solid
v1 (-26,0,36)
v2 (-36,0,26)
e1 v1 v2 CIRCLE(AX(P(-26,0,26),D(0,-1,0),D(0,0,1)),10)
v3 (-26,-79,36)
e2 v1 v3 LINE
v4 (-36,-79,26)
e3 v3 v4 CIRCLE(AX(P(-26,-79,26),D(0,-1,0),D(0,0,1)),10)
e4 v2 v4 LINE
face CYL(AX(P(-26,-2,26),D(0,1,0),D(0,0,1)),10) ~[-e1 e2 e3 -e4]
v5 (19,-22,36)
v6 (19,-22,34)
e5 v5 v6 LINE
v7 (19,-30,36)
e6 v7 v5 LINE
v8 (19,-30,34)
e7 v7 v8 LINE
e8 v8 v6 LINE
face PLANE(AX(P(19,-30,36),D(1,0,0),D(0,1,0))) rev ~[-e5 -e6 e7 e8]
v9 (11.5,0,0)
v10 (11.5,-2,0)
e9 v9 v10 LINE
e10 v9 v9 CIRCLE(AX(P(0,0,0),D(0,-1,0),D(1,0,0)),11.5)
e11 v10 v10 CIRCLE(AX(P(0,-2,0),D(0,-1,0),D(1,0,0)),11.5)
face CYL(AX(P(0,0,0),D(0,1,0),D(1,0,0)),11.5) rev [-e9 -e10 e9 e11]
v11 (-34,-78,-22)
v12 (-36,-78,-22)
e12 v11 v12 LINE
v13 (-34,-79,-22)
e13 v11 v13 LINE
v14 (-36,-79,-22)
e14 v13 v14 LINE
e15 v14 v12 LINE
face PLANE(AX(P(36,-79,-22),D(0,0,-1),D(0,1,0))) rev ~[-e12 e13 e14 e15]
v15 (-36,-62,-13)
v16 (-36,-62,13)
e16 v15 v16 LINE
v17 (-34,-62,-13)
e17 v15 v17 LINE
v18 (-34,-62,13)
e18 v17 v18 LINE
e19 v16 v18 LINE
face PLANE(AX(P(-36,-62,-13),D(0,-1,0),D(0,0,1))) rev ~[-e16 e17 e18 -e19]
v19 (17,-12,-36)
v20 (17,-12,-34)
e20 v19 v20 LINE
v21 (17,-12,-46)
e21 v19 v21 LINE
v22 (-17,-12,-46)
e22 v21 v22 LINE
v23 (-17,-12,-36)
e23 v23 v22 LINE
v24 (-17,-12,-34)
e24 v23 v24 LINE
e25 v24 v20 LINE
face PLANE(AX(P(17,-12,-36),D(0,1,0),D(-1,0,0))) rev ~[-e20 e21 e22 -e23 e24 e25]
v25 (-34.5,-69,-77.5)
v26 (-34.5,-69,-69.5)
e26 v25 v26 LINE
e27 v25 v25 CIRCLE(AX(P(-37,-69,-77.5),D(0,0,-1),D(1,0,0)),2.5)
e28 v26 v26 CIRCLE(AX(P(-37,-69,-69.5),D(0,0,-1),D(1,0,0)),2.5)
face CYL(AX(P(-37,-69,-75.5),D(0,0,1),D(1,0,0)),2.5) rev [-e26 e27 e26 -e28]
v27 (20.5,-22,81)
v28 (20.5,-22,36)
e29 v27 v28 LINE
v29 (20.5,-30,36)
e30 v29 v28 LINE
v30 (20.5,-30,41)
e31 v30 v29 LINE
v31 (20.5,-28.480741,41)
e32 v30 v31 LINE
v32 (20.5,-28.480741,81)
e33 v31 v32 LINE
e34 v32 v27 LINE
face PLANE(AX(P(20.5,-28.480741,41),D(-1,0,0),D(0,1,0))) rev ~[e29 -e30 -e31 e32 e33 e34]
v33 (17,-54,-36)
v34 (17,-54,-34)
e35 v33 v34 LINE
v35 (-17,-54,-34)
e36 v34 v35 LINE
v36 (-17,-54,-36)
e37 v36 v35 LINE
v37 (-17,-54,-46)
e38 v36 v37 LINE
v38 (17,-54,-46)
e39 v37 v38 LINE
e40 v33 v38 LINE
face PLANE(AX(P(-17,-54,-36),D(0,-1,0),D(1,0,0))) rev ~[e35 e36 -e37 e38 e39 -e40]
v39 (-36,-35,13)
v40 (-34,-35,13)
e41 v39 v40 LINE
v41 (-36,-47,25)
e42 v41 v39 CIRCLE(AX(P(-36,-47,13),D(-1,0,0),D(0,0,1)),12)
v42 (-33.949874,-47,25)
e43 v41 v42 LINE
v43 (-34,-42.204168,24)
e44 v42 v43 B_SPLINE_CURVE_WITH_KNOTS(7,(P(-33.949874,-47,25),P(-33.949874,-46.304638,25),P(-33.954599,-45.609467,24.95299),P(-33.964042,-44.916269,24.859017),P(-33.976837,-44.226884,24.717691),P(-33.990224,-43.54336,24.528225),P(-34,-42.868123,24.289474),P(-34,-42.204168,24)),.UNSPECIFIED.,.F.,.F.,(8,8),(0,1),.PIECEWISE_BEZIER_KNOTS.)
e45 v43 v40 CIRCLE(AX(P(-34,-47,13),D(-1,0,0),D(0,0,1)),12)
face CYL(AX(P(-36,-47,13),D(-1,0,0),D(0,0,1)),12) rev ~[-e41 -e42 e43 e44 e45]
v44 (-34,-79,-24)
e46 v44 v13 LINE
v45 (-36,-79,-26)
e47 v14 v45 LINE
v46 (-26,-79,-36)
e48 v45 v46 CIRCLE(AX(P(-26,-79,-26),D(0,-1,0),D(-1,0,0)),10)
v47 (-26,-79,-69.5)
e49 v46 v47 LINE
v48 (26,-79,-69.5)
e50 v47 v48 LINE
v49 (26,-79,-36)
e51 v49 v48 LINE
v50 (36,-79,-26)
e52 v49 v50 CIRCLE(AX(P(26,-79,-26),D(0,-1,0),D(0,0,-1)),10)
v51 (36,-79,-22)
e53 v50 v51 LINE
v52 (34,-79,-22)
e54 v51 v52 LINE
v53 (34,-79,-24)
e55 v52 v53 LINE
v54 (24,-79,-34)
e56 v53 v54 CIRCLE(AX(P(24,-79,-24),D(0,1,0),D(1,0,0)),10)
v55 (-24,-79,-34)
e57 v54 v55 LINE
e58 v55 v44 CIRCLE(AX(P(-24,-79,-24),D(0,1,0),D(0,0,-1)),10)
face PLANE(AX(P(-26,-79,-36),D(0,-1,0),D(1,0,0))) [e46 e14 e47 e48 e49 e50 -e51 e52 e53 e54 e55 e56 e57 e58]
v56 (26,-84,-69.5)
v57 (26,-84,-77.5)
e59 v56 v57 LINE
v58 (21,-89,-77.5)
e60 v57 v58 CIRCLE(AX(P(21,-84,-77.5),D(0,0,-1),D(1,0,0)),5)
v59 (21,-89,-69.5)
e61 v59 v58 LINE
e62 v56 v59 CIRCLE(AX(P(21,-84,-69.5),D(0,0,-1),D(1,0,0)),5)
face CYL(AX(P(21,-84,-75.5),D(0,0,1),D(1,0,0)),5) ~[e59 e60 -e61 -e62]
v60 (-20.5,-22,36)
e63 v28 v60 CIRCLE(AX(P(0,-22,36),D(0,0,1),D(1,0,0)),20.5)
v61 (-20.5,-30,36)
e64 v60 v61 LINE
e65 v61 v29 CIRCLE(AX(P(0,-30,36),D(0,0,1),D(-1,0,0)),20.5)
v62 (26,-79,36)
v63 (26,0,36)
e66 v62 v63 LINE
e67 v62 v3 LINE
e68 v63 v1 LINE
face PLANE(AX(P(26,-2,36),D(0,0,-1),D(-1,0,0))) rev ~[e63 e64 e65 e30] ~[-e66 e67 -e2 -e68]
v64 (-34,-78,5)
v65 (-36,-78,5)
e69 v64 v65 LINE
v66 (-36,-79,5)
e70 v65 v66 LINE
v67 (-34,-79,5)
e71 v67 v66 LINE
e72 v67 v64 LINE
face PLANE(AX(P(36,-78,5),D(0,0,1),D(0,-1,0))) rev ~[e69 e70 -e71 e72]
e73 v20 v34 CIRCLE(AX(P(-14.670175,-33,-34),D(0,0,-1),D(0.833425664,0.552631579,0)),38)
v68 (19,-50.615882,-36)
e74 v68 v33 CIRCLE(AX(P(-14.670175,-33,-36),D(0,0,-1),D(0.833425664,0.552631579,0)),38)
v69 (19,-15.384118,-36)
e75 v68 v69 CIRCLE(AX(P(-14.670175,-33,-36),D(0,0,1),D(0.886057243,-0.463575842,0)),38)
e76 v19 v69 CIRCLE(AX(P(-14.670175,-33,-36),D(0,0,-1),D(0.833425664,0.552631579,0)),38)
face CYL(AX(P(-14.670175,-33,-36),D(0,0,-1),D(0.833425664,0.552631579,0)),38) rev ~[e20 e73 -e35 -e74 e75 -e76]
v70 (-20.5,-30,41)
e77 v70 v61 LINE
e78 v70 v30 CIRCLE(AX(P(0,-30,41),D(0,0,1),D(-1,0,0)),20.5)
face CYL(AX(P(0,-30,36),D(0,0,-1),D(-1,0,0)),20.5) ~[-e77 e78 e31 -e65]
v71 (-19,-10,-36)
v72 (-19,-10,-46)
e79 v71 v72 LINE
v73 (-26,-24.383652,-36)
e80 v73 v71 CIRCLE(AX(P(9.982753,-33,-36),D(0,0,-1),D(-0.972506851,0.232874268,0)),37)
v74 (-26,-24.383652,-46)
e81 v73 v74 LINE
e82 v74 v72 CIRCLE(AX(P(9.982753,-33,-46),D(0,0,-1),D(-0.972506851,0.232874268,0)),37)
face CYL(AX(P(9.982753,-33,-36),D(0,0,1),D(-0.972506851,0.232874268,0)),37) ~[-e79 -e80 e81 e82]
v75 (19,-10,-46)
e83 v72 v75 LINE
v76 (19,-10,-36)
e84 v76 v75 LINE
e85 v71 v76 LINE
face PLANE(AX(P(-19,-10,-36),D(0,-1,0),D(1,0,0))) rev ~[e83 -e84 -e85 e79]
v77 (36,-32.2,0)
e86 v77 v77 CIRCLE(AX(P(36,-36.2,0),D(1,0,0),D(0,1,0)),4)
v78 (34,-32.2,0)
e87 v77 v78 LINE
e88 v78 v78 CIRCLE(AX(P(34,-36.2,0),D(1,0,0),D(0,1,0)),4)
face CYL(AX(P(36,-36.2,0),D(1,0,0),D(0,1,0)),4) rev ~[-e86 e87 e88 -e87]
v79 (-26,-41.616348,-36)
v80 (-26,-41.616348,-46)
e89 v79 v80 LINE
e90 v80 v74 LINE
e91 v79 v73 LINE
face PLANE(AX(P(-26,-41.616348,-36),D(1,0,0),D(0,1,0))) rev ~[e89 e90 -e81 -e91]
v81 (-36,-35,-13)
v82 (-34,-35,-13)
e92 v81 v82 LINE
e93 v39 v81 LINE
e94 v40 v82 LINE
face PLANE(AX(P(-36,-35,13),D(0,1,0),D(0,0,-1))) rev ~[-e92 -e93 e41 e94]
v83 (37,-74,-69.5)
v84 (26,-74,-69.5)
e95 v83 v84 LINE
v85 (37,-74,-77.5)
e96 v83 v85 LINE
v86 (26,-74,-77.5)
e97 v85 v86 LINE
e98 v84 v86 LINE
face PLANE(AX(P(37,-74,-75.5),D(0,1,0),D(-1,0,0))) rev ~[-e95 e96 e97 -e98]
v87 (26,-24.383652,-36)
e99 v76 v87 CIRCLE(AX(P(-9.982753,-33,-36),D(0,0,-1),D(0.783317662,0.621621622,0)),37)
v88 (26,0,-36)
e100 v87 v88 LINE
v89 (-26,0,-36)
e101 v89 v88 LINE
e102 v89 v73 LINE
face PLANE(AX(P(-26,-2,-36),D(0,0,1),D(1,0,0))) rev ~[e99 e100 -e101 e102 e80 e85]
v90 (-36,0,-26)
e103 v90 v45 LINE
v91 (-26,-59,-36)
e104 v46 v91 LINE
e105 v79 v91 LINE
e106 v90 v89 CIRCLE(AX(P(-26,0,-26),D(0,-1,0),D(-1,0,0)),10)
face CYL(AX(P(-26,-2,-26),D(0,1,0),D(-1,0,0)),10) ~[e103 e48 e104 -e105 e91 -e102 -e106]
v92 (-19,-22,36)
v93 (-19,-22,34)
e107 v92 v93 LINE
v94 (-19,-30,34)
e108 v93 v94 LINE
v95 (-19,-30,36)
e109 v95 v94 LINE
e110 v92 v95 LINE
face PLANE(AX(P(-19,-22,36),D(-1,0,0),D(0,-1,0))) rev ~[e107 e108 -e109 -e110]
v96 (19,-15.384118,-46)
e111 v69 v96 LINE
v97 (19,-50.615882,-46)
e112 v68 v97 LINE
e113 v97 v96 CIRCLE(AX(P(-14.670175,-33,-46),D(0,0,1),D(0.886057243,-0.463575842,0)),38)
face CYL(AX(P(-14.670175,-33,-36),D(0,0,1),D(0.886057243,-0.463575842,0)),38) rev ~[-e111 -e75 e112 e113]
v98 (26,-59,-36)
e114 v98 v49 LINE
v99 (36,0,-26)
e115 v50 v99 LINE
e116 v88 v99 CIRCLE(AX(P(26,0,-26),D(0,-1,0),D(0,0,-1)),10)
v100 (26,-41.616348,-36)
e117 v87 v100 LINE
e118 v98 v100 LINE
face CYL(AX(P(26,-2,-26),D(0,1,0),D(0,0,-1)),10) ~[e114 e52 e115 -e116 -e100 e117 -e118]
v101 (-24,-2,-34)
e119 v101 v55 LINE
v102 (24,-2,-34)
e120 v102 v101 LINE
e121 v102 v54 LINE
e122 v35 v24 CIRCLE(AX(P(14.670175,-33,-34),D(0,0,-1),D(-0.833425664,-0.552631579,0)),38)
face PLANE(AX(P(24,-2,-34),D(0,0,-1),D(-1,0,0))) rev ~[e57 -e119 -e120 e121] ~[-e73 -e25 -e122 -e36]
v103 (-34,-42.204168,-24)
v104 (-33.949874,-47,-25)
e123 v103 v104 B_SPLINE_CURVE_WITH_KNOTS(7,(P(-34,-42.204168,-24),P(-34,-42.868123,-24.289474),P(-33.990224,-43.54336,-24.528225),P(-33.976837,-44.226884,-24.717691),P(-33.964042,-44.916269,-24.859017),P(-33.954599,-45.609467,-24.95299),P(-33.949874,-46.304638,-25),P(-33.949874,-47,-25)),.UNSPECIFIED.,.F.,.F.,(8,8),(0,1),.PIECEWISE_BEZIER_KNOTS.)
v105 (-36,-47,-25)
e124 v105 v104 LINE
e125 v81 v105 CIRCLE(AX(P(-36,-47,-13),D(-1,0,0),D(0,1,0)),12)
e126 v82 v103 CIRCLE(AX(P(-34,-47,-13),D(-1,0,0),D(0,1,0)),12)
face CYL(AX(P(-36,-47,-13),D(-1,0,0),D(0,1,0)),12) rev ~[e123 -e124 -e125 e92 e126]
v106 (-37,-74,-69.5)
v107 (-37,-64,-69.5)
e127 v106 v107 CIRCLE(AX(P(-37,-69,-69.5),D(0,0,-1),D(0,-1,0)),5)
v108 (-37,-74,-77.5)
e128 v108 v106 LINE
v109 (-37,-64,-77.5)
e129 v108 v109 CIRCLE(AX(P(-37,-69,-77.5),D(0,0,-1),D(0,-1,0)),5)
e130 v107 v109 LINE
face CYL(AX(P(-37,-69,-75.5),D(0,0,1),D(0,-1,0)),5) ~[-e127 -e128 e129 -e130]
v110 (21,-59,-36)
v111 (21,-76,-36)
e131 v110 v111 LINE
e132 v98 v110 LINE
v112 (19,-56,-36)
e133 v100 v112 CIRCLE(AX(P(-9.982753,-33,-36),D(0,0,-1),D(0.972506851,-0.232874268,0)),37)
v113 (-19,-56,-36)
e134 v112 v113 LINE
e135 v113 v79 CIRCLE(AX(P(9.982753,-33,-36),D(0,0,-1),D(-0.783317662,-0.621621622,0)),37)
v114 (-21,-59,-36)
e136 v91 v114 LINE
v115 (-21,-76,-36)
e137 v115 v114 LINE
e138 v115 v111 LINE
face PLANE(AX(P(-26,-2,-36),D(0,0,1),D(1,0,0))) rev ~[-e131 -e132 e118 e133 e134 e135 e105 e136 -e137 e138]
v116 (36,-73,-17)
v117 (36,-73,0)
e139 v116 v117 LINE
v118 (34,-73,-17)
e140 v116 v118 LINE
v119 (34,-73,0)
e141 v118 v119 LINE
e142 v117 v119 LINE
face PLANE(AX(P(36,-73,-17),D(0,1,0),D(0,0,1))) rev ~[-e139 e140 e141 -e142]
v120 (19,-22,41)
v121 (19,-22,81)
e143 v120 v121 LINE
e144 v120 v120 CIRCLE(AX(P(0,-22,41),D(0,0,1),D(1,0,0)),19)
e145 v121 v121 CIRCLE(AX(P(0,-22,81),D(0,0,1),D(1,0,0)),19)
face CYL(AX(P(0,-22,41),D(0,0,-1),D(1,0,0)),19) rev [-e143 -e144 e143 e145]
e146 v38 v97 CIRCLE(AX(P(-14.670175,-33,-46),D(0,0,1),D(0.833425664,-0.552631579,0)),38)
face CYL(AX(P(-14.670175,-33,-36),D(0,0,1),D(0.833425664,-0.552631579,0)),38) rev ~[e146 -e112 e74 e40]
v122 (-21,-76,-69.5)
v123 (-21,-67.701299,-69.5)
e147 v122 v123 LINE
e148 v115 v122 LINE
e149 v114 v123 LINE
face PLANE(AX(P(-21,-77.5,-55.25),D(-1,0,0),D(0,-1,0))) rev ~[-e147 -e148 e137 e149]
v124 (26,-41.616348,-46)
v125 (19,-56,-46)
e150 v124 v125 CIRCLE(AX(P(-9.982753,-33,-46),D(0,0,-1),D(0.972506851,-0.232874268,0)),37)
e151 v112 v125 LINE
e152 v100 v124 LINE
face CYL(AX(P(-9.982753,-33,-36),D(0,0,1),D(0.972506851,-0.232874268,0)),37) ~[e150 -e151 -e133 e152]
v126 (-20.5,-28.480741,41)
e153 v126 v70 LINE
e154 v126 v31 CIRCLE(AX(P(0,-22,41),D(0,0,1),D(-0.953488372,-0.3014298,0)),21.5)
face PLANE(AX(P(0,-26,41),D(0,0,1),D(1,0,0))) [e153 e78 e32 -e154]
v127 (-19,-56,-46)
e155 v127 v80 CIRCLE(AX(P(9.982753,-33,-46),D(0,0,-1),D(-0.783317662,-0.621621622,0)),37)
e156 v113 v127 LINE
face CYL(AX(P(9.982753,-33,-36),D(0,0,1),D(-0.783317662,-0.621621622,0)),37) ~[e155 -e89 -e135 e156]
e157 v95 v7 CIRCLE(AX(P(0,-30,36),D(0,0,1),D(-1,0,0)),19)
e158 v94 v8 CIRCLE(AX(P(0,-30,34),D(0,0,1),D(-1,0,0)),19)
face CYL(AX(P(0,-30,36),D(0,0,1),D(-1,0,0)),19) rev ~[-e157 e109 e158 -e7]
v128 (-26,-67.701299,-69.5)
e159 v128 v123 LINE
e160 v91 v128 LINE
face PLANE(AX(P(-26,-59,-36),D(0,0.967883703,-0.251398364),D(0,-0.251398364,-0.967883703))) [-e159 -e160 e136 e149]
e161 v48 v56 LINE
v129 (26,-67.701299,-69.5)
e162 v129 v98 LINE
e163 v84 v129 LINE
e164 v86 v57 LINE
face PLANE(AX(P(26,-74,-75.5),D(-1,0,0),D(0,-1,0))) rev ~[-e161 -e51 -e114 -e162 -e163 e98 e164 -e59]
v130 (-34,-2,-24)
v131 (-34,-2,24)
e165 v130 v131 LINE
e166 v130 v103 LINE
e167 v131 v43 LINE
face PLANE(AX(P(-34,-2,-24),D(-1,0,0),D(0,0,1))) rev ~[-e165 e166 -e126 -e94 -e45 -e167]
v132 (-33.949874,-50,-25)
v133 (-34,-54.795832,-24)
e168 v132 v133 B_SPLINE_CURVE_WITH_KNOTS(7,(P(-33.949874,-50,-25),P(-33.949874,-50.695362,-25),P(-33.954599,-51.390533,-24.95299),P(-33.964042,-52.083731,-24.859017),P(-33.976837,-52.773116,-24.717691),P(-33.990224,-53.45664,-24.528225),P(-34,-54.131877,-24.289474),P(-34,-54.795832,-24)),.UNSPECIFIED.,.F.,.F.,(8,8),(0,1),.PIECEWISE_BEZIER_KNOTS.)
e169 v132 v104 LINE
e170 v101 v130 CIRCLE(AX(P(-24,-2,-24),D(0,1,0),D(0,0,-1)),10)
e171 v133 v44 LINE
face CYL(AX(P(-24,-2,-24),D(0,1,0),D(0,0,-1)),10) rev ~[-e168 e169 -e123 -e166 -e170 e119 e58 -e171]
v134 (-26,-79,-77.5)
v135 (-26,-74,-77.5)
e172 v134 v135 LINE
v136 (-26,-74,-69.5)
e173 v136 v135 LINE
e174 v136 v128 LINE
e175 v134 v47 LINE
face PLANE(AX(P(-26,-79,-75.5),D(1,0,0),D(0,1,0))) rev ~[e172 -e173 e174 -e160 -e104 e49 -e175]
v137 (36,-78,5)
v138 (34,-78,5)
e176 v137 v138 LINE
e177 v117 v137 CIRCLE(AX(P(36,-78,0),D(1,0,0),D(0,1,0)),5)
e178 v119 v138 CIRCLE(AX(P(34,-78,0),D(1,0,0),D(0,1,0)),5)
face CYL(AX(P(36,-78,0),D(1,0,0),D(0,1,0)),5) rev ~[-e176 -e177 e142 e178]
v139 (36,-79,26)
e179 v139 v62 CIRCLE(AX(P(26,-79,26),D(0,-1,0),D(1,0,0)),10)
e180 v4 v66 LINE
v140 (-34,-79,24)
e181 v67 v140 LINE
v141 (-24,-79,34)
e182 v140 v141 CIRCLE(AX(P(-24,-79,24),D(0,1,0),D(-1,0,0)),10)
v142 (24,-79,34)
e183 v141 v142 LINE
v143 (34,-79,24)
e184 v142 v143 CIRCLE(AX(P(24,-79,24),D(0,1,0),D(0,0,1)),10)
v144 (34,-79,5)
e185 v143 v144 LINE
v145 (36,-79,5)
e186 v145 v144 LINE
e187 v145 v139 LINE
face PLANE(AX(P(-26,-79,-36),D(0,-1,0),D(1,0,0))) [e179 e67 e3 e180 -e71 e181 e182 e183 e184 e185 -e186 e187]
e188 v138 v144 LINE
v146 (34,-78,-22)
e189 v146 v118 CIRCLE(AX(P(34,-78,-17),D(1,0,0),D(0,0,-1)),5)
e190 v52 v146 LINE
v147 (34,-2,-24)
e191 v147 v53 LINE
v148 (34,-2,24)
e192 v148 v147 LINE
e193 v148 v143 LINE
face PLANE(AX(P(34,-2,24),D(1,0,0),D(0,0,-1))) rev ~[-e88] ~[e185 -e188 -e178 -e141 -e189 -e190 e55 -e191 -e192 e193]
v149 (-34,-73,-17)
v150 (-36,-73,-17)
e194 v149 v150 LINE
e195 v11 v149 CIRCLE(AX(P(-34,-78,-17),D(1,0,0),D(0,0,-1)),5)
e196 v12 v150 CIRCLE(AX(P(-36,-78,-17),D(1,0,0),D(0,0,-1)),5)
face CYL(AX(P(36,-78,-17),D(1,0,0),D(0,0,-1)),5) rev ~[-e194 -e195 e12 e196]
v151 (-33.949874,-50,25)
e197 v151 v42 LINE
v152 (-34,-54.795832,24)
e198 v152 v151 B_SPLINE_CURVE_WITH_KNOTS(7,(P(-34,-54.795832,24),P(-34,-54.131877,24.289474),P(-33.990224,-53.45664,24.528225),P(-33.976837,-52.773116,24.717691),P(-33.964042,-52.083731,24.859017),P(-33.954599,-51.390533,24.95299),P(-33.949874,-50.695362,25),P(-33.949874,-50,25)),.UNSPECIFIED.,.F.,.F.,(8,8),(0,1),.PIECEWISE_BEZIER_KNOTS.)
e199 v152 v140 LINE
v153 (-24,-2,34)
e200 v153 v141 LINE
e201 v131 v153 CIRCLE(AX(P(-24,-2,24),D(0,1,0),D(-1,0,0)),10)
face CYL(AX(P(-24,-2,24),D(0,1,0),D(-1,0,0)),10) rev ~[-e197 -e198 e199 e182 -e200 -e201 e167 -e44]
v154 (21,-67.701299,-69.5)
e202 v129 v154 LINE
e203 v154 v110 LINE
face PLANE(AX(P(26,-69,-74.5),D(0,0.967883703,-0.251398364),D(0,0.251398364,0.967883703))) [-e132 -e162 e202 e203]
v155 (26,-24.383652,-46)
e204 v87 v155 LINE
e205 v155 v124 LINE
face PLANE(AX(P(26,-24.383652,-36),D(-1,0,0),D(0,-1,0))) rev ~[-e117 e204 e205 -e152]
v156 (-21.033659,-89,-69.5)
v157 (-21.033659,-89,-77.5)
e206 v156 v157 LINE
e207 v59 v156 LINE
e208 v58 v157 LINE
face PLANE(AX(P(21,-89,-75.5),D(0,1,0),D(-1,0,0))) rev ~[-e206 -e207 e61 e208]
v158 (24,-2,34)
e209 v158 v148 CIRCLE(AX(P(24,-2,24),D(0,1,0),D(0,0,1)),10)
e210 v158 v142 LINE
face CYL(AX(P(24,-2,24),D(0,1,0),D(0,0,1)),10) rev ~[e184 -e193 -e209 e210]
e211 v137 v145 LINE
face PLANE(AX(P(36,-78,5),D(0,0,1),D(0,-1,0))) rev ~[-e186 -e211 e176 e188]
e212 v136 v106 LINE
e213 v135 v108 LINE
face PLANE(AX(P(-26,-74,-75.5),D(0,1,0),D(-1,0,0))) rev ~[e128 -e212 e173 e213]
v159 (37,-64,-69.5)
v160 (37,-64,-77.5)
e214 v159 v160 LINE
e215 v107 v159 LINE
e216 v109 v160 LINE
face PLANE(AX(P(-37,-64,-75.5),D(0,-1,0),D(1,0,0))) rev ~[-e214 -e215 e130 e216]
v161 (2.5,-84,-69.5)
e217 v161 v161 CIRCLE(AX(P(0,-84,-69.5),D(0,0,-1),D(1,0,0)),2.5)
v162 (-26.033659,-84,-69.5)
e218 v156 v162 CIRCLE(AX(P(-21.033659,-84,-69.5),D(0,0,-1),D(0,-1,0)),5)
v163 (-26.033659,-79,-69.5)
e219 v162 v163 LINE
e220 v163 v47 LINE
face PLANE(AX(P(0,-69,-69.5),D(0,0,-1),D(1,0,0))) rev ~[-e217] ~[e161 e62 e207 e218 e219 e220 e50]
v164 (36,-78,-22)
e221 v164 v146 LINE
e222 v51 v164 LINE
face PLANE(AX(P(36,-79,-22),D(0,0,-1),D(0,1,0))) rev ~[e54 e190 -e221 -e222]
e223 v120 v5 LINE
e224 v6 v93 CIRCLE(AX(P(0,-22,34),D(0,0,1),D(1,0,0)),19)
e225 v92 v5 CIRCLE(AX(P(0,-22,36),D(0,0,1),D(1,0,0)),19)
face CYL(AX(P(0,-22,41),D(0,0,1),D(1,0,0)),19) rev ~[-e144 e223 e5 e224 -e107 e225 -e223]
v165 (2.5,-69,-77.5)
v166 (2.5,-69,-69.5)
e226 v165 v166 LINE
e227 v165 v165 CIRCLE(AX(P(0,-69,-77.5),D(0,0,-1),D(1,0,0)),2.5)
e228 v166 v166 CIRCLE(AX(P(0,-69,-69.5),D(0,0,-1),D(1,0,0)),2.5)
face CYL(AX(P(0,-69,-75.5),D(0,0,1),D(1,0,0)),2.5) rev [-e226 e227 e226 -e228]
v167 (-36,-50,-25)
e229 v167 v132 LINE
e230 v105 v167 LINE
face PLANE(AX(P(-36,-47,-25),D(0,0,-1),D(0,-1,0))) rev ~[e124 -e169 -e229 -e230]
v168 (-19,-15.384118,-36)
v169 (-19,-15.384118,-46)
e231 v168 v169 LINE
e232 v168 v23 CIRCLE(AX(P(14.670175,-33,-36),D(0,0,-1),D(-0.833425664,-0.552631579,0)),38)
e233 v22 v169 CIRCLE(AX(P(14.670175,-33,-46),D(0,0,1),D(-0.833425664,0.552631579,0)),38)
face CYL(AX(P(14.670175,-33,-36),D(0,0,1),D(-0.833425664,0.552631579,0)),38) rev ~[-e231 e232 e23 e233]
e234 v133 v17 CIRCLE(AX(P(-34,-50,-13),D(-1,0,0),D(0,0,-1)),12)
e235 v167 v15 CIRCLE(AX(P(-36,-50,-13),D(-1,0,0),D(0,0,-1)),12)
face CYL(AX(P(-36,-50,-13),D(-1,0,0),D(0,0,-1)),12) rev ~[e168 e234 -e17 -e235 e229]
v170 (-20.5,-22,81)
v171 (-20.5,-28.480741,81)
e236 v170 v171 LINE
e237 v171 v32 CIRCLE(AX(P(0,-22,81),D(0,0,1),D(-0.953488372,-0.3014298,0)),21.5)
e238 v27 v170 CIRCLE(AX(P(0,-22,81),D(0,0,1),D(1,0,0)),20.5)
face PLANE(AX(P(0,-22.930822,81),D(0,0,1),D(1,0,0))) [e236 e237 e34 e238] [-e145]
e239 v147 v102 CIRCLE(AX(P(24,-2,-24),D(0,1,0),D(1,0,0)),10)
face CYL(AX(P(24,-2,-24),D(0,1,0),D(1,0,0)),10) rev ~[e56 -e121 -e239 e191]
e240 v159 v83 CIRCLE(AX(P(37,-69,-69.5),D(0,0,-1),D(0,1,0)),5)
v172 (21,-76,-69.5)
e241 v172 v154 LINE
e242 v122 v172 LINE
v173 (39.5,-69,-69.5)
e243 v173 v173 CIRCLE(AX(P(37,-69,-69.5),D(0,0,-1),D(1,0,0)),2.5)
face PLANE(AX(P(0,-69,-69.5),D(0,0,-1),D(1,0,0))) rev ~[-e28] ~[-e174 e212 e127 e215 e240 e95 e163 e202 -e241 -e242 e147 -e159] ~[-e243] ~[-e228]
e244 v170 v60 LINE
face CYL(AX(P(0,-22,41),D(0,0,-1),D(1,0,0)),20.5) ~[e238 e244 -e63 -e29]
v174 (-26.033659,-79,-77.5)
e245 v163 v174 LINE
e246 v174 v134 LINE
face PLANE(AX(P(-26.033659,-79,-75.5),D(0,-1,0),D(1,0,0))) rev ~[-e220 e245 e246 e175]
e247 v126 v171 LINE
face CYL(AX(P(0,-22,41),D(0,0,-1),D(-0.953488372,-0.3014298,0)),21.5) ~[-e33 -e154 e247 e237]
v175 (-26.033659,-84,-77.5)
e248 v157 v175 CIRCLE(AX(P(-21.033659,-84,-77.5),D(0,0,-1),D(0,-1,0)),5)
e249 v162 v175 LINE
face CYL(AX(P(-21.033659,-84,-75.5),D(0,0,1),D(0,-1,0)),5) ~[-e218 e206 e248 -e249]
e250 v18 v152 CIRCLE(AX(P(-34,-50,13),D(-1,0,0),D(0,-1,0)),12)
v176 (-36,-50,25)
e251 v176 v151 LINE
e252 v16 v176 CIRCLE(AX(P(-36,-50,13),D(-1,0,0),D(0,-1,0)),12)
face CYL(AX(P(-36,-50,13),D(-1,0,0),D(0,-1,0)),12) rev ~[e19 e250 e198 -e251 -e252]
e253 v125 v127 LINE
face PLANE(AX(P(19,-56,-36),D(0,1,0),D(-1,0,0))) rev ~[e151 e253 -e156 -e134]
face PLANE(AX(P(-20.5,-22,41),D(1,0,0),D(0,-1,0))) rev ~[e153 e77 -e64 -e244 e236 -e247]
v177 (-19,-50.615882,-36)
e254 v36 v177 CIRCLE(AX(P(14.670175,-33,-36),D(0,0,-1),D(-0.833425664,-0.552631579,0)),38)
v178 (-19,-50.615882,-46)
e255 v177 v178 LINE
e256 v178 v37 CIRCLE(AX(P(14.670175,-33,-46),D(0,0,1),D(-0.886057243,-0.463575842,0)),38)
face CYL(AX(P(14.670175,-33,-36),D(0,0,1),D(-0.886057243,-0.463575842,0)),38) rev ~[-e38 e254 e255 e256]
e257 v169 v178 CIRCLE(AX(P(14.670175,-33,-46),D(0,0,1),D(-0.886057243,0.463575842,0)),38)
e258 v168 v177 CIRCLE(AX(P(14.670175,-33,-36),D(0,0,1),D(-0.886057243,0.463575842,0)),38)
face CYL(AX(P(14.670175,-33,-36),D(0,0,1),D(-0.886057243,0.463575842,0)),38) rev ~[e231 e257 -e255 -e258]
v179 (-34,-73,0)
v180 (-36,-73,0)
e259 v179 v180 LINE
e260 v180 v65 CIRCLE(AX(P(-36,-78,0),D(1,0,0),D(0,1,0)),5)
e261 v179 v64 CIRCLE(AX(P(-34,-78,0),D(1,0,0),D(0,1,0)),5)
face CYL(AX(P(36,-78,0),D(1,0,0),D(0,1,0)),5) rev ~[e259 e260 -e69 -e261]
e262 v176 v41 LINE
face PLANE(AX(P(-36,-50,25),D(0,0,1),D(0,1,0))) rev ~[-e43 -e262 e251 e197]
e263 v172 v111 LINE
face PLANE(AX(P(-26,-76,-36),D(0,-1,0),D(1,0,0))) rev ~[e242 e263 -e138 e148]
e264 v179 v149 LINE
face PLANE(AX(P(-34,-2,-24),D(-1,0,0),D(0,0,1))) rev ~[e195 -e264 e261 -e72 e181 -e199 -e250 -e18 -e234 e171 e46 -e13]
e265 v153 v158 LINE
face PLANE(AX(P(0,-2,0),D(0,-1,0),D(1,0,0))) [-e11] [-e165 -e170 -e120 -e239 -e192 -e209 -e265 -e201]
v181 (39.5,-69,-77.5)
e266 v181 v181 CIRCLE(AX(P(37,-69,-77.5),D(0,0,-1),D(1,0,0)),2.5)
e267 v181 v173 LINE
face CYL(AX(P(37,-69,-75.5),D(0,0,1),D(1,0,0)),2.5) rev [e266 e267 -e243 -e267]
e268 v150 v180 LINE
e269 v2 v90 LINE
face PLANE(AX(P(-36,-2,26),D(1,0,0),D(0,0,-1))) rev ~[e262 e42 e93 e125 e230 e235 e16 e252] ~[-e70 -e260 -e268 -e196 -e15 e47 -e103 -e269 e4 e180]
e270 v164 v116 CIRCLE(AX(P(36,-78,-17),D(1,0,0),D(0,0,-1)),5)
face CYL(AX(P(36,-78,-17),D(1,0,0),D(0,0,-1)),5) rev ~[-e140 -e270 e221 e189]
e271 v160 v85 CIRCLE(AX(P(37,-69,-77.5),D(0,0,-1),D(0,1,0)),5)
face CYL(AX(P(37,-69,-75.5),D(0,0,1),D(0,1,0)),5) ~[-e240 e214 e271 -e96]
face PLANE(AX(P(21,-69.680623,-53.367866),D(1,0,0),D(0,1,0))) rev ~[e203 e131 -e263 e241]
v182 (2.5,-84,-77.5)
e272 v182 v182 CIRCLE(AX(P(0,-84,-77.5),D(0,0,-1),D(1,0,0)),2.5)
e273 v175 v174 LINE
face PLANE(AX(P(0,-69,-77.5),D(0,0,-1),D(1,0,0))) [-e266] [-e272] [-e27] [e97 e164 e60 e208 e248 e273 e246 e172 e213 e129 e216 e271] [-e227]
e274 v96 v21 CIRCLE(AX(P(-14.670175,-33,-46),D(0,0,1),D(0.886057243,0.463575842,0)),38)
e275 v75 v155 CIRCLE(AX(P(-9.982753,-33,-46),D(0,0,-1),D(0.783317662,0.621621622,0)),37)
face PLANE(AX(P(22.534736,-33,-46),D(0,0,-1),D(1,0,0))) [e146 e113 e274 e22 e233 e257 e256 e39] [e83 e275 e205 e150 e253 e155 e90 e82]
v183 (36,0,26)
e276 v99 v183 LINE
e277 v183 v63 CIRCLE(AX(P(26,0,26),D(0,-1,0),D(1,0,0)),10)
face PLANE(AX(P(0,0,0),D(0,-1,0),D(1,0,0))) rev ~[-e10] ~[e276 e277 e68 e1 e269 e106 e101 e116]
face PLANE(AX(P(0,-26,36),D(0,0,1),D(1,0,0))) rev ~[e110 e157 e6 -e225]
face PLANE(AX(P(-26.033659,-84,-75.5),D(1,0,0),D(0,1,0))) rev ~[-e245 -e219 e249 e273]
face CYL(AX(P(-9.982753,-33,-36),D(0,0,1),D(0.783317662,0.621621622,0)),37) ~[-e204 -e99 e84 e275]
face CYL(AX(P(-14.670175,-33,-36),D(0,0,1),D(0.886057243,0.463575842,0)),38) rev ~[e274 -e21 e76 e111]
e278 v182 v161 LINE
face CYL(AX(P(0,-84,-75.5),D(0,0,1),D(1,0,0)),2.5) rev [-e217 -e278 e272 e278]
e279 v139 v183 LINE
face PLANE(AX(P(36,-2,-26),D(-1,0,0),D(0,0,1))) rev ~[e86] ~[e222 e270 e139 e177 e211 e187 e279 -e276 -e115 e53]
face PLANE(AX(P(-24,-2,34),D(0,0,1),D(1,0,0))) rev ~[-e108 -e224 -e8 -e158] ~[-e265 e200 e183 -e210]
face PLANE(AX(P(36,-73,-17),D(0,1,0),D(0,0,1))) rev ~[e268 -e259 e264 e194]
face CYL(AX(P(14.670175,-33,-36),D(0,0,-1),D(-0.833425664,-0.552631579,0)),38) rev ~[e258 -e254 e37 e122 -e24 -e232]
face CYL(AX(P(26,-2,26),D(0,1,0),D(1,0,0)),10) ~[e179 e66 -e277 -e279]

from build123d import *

# Parameters (mm, degrees)
F0_R      = 11.5
F1_DEPTH  = 2
F3_DEPTH  = 77
F5_DEPTH  = 3
F7_DEPTH  = 3
F9_DEPTH  = 5
F11_DEPTH = 3
F12_R     = 19
F13_DEPTH = 8
F14_R     = 19
F15_DEPTH = 40
F16_W     = 52
F16_H     = 3
F17_DEPTH = 38.5
F19_DEPTH = 3
F21_DEPTH = 10
F22_W     = 3
F22_H     = 38.5
F23_DEPTH = 5
F25_R     = 2.5
F25_W     = 47
F25_H     = 2
F26_DEPTH = 5
F27_DEPTH = 1
F29_DEPTH = 75
F30_DEPTH = 2
F24_W     = 3
F24_H     = 38.5
F31_DEPTH = 5
F32_R     = 4
F33_DEPTH = 3


with BuildPart() as f1:
    # F0 (on Front) → F1 (new body)
    with BuildSketch(Plane.XZ):
        with BuildLine():
            Line((26, 36), (-26, 36))
            ThreePointArc((-26, 36), (-33.0710678119, 33.0710678119), (-36, 26))
            Line((-36, 26), (-36, -26))
            ThreePointArc((-36, -26), (-33.0710678119, -33.0710678119), (-26, -36))
            Line((-26, -36), (26, -36))
            ThreePointArc((26, -36), (33.0710678119, -33.0710678119), (36, -26))
            Line((36, -26), (36, 26))
            ThreePointArc((36, 26), (33.0710678119, 33.0710678119), (26, 36))
        make_face()
        with BuildLine():
            Line((24, -34), (-24, -34))
            ThreePointArc((-24, -34), (-31.0710678119, -31.0710678119), (-34, -24))
            Line((-34, -24), (-34, 24))
            ThreePointArc((-34, 24), (-31.0710678119, 31.0710678119), (-24, 34))
            Line((-24, 34), (24, 34))
            ThreePointArc((24, 34), (31.0710678119, 31.0710678119), (34, 24))
            Line((34, 24), (34, -24))
            ThreePointArc((34, -24), (31.0710678119, -31.0710678119), (24, -34))
        make_face(mode=Mode.SUBTRACT)
        with BuildLine():
            ThreePointArc((-34, -24), (-31.0710678119, -31.0710678119), (-24, -34))
            Line((-24, -34), (24, -34))
            ThreePointArc((24, -34), (31.0710678119, -31.0710678119), (34, -24))
            Line((34, -24), (34, 24))
            ThreePointArc((34, 24), (31.0710678119, 31.0710678119), (24, 34))
            Line((24, 34), (-24, 34))
            ThreePointArc((-24, 34), (-31.0710678119, 31.0710678119), (-34, 24))
            Line((-34, 24), (-34, -24))
        make_face()
        Circle(F0_R, mode=Mode.SUBTRACT)
    extrude(amount=F1_DEPTH)

    # F2 (on face) → F3 (join)
    with BuildSketch(Plane.XZ.offset(2)):
        with BuildLine():
            Line((26, 36), (-26, 36))
            ThreePointArc((-26, 36), (-33.0710678119, 33.0710678119), (-36, 26))
            Line((-36, 26), (-36, -26))
            ThreePointArc((-36, -26), (-33.0710678119, -33.0710678119), (-26, -36))
            Line((-26, -36), (26, -36))
            ThreePointArc((26, -36), (33.0710678119, -33.0710678119), (36, -26))
            Line((36, -26), (36, 26))
            ThreePointArc((36, 26), (33.0710678119, 33.0710678119), (26, 36))
        make_face()
        with BuildLine():
            Line((24, -34), (-24, -34))
            ThreePointArc((-24, -34), (-31.0710678119, -31.0710678119), (-34, -24))
            Line((-34, -24), (-34, 24))
            ThreePointArc((-34, 24), (-31.0710678119, 31.0710678119), (-24, 34))
            Line((-24, 34), (24, 34))
            ThreePointArc((24, 34), (31.0710678119, 31.0710678119), (34, 24))
            Line((34, 24), (34, -24))
            ThreePointArc((34, -24), (31.0710678119, -31.0710678119), (24, -34))
        make_face(mode=Mode.SUBTRACT)
    extrude(amount=F3_DEPTH)

    # F4 (on face) → F5 (cut)
    with BuildSketch(Plane(origin=(-36, 0, 0), x_dir=(0, -1, 0), z_dir=(-1, 0, 0))):
        with BuildLine():
            ThreePointArc((62, 13), (58.4852813742, 21.4852813742), (50, 25))
            Line((50, 25), (47, 25))
            ThreePointArc((47, 25), (38.5147186258, 21.4852813742), (35, 13))
            Line((35, 13), (35, -13))
            ThreePointArc((35, -13), (38.5147186258, -21.4852813742), (47, -25))
            Line((47, -25), (50, -25))
            ThreePointArc((50, -25), (58.4852813742, -21.4852813742), (62, -13))
            Line((62, -13), (62, 13))
        make_face()
    extrude(amount=-F5_DEPTH, mode=Mode.SUBTRACT)

    # F6 (on face) → F7 (cut)
    with BuildSketch(Plane.XY.offset(36)):
        with BuildLine():
            Line((19, -30), (19, -22))
            ThreePointArc((19, -22), (0, -3), (-19, -22))
            Line((-19, -22), (-19, -30))
            ThreePointArc((-19, -30), (0, -49), (19, -30))
        make_face()
    extrude(amount=-F7_DEPTH, mode=Mode.SUBTRACT)

    # F8 (on face) → F9 (join)
    with BuildSketch(Plane.XY.offset(36)):
        with BuildLine():
            Line((-20.5, -22), (-20.5, -30))
            ThreePointArc((-20.5, -30), (0, -50.5), (20.5, -30))
            Line((20.5, -30), (20.5, -22))
            ThreePointArc((20.5, -22), (0, -1.5), (-20.5, -22))
        make_face()
        with BuildLine():
            ThreePointArc((-19, -22), (0, -3), (19, -22))
            Line((19, -22), (19, -22.3025978408))
            Line((19, -22.3025978408), (19, -29.6974021592))
            Line((19, -29.6974021592), (19, -30))
            ThreePointArc((19, -30), (0, -49), (-19, -30))
            Line((-19, -30), (-19, -22))
        make_face(mode=Mode.SUBTRACT)
        with BuildLine():
            Line((19, -22.3025978408), (19, -22))
            ThreePointArc((19, -22), (0, -3), (-19, -22))
            Line((-19, -22), (-19, -30))
            ThreePointArc((-19, -30), (0, -49), (19, -30))
            Line((19, -30), (19, -29.6974021592))
            Line((19, -29.6974021592), (19, -22.3025978408))
        make_face()
    extrude(amount=F9_DEPTH)

    # F10 (on face) → F11 (join)
    with BuildSketch(Plane.XY.offset(36)):
        with BuildLine():
            Line((20.5, -30), (20.5, -22))
            ThreePointArc((20.5, -22), (0, -1.5), (-20.5, -22))
            Line((-20.5, -22), (-20.5, -30))
            ThreePointArc((-20.5, -30), (0, -50.5), (20.5, -30))
        make_face()
    extrude(amount=F11_DEPTH)

    # F12 (on face) → F13 (cut)
    with BuildSketch(Plane.XY.offset(41)):
        with Locations((0, -22)):
            Circle(F12_R)
    extrude(amount=-F13_DEPTH, mode=Mode.SUBTRACT)

    # F14 (on face) → F15 (join)
    with BuildSketch(Plane.XY.offset(41)):
        with BuildLine():
            Line((-20.5, -22), (-20.5, -28.4807406984))
            ThreePointArc((-20.5, -28.4807406984), (0, -43.5), (20.5, -28.4807406984))
            Line((20.5, -28.4807406984), (20.5, -22))
            ThreePointArc((20.5, -22), (0, -1.5), (-20.5, -22))
        make_face()
        with Locations((0, -22)):
            Circle(F14_R, mode=Mode.SUBTRACT)
    extrude(amount=F15_DEPTH)

    # F16 (on face) → F17 (join)
    with BuildSketch(Plane(origin=(0, 0, -36), x_dir=(1, 0, 0), z_dir=(0, 0, -1))):
        with Locations((0, 77.5)):
            Rectangle(F16_W, F16_H)
    extrude(amount=F17_DEPTH)

    # F18 (on face) → F19 (cut)
    with BuildSketch(Plane(origin=(0, 0, -36), x_dir=(1, 0, 0), z_dir=(0, 0, -1))):
        with BuildLine():
            Line((-17, 12), (17, 12))
            ThreePointArc((17, 12), (23.3298247558, 33), (17, 54))
            Line((17, 54), (-17, 54))
            ThreePointArc((-17, 54), (-23.3298247558, 33), (-17, 12))
        make_face()
    extrude(amount=-F19_DEPTH, mode=Mode.SUBTRACT)

    # F20 (on face) → F21 (join)
    with BuildSketch(Plane(origin=(0, 0, -36), x_dir=(1, 0, 0), z_dir=(0, 0, -1))):
        with BuildLine():
            ThreePointArc((19, 50.6158820109), (23.3298247558, 33), (19, 15.3841179891))
            Line((19, 15.3841179891), (19, 10))
            ThreePointArc((19, 10), (23.2866263695, 16.8090036252), (26, 24.3836521016))
            Line((26, 24.3836521016), (26, 41.6163478984))
            ThreePointArc((26, 41.6163478984), (23.2866263695, 49.1909963748), (19, 56))
            Line((19, 56), (19, 50.6158820109))
        make_face()
        with BuildLine():
            Line((-19, 56), (-19, 50.6158820109))
            ThreePointArc((-19, 50.6158820109), (-18.0437883513, 52.3338197434), (-17, 54))
            Line((-17, 54), (17, 54))
            ThreePointArc((17, 54), (18.0437883513, 52.3338197434), (19, 50.6158820109))
            Line((19, 50.6158820109), (19, 56))
            Line((19, 56), (-19, 56))
        make_face()
        with BuildLine():
            Line((-19, 10), (-19, 15.3841179891))
            ThreePointArc((-19, 15.3841179891), (-23.3298247558, 33), (-19, 50.6158820109))
            Line((-19, 50.6158820109), (-19, 56))
            ThreePointArc((-19, 56), (-23.2866263695, 49.1909963748), (-26, 41.6163478984))
            Line((-26, 41.6163478984), (-26, 24.3836521016))
            ThreePointArc((-26, 24.3836521016), (-23.2866263695, 16.8090036252), (-19, 10))
        make_face()
        with BuildLine():
            Line((17, 12), (-17, 12))
            ThreePointArc((-17, 12), (-18.0437883513, 13.6661802566), (-19, 15.3841179891))
            Line((-19, 15.3841179891), (-19, 10))
            Line((-19, 10), (19, 10))
            Line((19, 10), (19, 15.3841179891))
            ThreePointArc((19, 15.3841179891), (18.0437883513, 13.6661802566), (17, 12))
        make_face()
    extrude(amount=F21_DEPTH)

    # F22 (on face) → F23 (join)
    with BuildSketch(Plane.YZ.offset(26)):
        Polygon((-76, -36), (-76, -74.5), (-69, -74.5), (-59, -36), align=None)
        with Locations((-77.5, -55.25)):
            Rectangle(F22_W, F22_H)
    extrude(amount=-F23_DEPTH)

    # F25 (on face) → F26 (join)
    with BuildSketch(Plane(origin=(0, 0, -74.5), x_dir=(1, 0, 0), z_dir=(0, 0, -1))):
        with BuildLine():
            Line((37, 74), (26, 74))
            Line((26, 74), (21, 74))
            Line((21, 74), (-26, 74))
            Line((-26, 74), (-37, 74))
            ThreePointArc((-37, 74), (-42, 69), (-37, 64))
            Line((-37, 64), (37, 64))
            ThreePointArc((37, 64), (42, 69), (37, 74))
        make_face()
        with Locations((-37, 69)):
            Circle(F25_R, mode=Mode.SUBTRACT)
        with Locations((0, 69)):
            Circle(F25_R, mode=Mode.SUBTRACT)
        with Locations((37, 69)):
            Circle(F25_R, mode=Mode.SUBTRACT)
        Polygon((26, 79), (-26, 79), (-26, 76), (21, 76), (21, 74), (26, 74), align=None)
        with Locations((-2.5, 75)):
            Rectangle(F25_W, F25_H)
        with BuildLine():
            Line((-26.0336585343, 79), (-26, 79))
            Line((-26, 79), (26, 79))
            Line((26, 79), (26, 84))
            ThreePointArc((26, 84), (24.5355339059, 87.5355339059), (21, 89))
            Line((21, 89), (-21.0336585343, 89))
            ThreePointArc((-21.0336585343, 89), (-24.5691924402, 87.5355339059), (-26.0336585343, 84))
            Line((-26.0336585343, 84), (-26.0336585343, 79))
        make_face()
        with Locations((0, 84)):
            Circle(F25_R, mode=Mode.SUBTRACT)
    extrude(amount=-F26_DEPTH)

    # F27 (add): faces of the model
    f27_faces = [f1.faces().sort_by_distance(p)[0] for p in [
        (23.5, -77.5, -74.5),
        (-2.5, -77.5, -74.5),
        (23.5, -72.5, -74.5),
        (-26.0168292671, -79.5298586246, -74.5),
        (-41.1514718626, -69, -74.5),
    ]]
    extrude(f27_faces, amount=F27_DEPTH)

    # F28 (on face) → F29 (cut)
    with BuildSketch(Plane.YZ.offset(36)):
        with BuildLine():
            Line((-78, 5), (-79, 5))
            Line((-79, 5), (-79, -22))
            Line((-79, -22), (-78, -22))
            ThreePointArc((-78, -22), (-74.4644660941, -20.5355339059), (-73, -17))
            Line((-73, -17), (-73, 0))
            ThreePointArc((-73, 0), (-74.4644660941, 3.5355339059), (-78, 5))
        make_face()
    extrude(amount=-F29_DEPTH, mode=Mode.SUBTRACT)

    # F30 (add): a face of the model
    f30_faces = [f1.faces().sort_by_distance(p)[0] for p in [
        (-0.0056811519, -75.1326620312, -75.5),
    ]]
    extrude(f30_faces, amount=F30_DEPTH)

    # F24 (on face) → F31 (join)
    with BuildSketch(Plane(origin=(-26, 0, 0), x_dir=(0, -1, 0), z_dir=(-1, 0, 0))):
        with Locations((77.5, -55.25)):
            Rectangle(F24_W, F24_H)
        Polygon((69, -74.5), (76, -74.5), (76, -36), (59, -36), align=None)
    extrude(amount=-F31_DEPTH)

    # F32 (on face) → F33 (cut)
    with BuildSketch(Plane.YZ.offset(36)):
        with Locations((-36.2, 0)):
            Circle(F32_R)
    extrude(amount=-F33_DEPTH, mode=Mode.SUBTRACT)


solid = f1.part
